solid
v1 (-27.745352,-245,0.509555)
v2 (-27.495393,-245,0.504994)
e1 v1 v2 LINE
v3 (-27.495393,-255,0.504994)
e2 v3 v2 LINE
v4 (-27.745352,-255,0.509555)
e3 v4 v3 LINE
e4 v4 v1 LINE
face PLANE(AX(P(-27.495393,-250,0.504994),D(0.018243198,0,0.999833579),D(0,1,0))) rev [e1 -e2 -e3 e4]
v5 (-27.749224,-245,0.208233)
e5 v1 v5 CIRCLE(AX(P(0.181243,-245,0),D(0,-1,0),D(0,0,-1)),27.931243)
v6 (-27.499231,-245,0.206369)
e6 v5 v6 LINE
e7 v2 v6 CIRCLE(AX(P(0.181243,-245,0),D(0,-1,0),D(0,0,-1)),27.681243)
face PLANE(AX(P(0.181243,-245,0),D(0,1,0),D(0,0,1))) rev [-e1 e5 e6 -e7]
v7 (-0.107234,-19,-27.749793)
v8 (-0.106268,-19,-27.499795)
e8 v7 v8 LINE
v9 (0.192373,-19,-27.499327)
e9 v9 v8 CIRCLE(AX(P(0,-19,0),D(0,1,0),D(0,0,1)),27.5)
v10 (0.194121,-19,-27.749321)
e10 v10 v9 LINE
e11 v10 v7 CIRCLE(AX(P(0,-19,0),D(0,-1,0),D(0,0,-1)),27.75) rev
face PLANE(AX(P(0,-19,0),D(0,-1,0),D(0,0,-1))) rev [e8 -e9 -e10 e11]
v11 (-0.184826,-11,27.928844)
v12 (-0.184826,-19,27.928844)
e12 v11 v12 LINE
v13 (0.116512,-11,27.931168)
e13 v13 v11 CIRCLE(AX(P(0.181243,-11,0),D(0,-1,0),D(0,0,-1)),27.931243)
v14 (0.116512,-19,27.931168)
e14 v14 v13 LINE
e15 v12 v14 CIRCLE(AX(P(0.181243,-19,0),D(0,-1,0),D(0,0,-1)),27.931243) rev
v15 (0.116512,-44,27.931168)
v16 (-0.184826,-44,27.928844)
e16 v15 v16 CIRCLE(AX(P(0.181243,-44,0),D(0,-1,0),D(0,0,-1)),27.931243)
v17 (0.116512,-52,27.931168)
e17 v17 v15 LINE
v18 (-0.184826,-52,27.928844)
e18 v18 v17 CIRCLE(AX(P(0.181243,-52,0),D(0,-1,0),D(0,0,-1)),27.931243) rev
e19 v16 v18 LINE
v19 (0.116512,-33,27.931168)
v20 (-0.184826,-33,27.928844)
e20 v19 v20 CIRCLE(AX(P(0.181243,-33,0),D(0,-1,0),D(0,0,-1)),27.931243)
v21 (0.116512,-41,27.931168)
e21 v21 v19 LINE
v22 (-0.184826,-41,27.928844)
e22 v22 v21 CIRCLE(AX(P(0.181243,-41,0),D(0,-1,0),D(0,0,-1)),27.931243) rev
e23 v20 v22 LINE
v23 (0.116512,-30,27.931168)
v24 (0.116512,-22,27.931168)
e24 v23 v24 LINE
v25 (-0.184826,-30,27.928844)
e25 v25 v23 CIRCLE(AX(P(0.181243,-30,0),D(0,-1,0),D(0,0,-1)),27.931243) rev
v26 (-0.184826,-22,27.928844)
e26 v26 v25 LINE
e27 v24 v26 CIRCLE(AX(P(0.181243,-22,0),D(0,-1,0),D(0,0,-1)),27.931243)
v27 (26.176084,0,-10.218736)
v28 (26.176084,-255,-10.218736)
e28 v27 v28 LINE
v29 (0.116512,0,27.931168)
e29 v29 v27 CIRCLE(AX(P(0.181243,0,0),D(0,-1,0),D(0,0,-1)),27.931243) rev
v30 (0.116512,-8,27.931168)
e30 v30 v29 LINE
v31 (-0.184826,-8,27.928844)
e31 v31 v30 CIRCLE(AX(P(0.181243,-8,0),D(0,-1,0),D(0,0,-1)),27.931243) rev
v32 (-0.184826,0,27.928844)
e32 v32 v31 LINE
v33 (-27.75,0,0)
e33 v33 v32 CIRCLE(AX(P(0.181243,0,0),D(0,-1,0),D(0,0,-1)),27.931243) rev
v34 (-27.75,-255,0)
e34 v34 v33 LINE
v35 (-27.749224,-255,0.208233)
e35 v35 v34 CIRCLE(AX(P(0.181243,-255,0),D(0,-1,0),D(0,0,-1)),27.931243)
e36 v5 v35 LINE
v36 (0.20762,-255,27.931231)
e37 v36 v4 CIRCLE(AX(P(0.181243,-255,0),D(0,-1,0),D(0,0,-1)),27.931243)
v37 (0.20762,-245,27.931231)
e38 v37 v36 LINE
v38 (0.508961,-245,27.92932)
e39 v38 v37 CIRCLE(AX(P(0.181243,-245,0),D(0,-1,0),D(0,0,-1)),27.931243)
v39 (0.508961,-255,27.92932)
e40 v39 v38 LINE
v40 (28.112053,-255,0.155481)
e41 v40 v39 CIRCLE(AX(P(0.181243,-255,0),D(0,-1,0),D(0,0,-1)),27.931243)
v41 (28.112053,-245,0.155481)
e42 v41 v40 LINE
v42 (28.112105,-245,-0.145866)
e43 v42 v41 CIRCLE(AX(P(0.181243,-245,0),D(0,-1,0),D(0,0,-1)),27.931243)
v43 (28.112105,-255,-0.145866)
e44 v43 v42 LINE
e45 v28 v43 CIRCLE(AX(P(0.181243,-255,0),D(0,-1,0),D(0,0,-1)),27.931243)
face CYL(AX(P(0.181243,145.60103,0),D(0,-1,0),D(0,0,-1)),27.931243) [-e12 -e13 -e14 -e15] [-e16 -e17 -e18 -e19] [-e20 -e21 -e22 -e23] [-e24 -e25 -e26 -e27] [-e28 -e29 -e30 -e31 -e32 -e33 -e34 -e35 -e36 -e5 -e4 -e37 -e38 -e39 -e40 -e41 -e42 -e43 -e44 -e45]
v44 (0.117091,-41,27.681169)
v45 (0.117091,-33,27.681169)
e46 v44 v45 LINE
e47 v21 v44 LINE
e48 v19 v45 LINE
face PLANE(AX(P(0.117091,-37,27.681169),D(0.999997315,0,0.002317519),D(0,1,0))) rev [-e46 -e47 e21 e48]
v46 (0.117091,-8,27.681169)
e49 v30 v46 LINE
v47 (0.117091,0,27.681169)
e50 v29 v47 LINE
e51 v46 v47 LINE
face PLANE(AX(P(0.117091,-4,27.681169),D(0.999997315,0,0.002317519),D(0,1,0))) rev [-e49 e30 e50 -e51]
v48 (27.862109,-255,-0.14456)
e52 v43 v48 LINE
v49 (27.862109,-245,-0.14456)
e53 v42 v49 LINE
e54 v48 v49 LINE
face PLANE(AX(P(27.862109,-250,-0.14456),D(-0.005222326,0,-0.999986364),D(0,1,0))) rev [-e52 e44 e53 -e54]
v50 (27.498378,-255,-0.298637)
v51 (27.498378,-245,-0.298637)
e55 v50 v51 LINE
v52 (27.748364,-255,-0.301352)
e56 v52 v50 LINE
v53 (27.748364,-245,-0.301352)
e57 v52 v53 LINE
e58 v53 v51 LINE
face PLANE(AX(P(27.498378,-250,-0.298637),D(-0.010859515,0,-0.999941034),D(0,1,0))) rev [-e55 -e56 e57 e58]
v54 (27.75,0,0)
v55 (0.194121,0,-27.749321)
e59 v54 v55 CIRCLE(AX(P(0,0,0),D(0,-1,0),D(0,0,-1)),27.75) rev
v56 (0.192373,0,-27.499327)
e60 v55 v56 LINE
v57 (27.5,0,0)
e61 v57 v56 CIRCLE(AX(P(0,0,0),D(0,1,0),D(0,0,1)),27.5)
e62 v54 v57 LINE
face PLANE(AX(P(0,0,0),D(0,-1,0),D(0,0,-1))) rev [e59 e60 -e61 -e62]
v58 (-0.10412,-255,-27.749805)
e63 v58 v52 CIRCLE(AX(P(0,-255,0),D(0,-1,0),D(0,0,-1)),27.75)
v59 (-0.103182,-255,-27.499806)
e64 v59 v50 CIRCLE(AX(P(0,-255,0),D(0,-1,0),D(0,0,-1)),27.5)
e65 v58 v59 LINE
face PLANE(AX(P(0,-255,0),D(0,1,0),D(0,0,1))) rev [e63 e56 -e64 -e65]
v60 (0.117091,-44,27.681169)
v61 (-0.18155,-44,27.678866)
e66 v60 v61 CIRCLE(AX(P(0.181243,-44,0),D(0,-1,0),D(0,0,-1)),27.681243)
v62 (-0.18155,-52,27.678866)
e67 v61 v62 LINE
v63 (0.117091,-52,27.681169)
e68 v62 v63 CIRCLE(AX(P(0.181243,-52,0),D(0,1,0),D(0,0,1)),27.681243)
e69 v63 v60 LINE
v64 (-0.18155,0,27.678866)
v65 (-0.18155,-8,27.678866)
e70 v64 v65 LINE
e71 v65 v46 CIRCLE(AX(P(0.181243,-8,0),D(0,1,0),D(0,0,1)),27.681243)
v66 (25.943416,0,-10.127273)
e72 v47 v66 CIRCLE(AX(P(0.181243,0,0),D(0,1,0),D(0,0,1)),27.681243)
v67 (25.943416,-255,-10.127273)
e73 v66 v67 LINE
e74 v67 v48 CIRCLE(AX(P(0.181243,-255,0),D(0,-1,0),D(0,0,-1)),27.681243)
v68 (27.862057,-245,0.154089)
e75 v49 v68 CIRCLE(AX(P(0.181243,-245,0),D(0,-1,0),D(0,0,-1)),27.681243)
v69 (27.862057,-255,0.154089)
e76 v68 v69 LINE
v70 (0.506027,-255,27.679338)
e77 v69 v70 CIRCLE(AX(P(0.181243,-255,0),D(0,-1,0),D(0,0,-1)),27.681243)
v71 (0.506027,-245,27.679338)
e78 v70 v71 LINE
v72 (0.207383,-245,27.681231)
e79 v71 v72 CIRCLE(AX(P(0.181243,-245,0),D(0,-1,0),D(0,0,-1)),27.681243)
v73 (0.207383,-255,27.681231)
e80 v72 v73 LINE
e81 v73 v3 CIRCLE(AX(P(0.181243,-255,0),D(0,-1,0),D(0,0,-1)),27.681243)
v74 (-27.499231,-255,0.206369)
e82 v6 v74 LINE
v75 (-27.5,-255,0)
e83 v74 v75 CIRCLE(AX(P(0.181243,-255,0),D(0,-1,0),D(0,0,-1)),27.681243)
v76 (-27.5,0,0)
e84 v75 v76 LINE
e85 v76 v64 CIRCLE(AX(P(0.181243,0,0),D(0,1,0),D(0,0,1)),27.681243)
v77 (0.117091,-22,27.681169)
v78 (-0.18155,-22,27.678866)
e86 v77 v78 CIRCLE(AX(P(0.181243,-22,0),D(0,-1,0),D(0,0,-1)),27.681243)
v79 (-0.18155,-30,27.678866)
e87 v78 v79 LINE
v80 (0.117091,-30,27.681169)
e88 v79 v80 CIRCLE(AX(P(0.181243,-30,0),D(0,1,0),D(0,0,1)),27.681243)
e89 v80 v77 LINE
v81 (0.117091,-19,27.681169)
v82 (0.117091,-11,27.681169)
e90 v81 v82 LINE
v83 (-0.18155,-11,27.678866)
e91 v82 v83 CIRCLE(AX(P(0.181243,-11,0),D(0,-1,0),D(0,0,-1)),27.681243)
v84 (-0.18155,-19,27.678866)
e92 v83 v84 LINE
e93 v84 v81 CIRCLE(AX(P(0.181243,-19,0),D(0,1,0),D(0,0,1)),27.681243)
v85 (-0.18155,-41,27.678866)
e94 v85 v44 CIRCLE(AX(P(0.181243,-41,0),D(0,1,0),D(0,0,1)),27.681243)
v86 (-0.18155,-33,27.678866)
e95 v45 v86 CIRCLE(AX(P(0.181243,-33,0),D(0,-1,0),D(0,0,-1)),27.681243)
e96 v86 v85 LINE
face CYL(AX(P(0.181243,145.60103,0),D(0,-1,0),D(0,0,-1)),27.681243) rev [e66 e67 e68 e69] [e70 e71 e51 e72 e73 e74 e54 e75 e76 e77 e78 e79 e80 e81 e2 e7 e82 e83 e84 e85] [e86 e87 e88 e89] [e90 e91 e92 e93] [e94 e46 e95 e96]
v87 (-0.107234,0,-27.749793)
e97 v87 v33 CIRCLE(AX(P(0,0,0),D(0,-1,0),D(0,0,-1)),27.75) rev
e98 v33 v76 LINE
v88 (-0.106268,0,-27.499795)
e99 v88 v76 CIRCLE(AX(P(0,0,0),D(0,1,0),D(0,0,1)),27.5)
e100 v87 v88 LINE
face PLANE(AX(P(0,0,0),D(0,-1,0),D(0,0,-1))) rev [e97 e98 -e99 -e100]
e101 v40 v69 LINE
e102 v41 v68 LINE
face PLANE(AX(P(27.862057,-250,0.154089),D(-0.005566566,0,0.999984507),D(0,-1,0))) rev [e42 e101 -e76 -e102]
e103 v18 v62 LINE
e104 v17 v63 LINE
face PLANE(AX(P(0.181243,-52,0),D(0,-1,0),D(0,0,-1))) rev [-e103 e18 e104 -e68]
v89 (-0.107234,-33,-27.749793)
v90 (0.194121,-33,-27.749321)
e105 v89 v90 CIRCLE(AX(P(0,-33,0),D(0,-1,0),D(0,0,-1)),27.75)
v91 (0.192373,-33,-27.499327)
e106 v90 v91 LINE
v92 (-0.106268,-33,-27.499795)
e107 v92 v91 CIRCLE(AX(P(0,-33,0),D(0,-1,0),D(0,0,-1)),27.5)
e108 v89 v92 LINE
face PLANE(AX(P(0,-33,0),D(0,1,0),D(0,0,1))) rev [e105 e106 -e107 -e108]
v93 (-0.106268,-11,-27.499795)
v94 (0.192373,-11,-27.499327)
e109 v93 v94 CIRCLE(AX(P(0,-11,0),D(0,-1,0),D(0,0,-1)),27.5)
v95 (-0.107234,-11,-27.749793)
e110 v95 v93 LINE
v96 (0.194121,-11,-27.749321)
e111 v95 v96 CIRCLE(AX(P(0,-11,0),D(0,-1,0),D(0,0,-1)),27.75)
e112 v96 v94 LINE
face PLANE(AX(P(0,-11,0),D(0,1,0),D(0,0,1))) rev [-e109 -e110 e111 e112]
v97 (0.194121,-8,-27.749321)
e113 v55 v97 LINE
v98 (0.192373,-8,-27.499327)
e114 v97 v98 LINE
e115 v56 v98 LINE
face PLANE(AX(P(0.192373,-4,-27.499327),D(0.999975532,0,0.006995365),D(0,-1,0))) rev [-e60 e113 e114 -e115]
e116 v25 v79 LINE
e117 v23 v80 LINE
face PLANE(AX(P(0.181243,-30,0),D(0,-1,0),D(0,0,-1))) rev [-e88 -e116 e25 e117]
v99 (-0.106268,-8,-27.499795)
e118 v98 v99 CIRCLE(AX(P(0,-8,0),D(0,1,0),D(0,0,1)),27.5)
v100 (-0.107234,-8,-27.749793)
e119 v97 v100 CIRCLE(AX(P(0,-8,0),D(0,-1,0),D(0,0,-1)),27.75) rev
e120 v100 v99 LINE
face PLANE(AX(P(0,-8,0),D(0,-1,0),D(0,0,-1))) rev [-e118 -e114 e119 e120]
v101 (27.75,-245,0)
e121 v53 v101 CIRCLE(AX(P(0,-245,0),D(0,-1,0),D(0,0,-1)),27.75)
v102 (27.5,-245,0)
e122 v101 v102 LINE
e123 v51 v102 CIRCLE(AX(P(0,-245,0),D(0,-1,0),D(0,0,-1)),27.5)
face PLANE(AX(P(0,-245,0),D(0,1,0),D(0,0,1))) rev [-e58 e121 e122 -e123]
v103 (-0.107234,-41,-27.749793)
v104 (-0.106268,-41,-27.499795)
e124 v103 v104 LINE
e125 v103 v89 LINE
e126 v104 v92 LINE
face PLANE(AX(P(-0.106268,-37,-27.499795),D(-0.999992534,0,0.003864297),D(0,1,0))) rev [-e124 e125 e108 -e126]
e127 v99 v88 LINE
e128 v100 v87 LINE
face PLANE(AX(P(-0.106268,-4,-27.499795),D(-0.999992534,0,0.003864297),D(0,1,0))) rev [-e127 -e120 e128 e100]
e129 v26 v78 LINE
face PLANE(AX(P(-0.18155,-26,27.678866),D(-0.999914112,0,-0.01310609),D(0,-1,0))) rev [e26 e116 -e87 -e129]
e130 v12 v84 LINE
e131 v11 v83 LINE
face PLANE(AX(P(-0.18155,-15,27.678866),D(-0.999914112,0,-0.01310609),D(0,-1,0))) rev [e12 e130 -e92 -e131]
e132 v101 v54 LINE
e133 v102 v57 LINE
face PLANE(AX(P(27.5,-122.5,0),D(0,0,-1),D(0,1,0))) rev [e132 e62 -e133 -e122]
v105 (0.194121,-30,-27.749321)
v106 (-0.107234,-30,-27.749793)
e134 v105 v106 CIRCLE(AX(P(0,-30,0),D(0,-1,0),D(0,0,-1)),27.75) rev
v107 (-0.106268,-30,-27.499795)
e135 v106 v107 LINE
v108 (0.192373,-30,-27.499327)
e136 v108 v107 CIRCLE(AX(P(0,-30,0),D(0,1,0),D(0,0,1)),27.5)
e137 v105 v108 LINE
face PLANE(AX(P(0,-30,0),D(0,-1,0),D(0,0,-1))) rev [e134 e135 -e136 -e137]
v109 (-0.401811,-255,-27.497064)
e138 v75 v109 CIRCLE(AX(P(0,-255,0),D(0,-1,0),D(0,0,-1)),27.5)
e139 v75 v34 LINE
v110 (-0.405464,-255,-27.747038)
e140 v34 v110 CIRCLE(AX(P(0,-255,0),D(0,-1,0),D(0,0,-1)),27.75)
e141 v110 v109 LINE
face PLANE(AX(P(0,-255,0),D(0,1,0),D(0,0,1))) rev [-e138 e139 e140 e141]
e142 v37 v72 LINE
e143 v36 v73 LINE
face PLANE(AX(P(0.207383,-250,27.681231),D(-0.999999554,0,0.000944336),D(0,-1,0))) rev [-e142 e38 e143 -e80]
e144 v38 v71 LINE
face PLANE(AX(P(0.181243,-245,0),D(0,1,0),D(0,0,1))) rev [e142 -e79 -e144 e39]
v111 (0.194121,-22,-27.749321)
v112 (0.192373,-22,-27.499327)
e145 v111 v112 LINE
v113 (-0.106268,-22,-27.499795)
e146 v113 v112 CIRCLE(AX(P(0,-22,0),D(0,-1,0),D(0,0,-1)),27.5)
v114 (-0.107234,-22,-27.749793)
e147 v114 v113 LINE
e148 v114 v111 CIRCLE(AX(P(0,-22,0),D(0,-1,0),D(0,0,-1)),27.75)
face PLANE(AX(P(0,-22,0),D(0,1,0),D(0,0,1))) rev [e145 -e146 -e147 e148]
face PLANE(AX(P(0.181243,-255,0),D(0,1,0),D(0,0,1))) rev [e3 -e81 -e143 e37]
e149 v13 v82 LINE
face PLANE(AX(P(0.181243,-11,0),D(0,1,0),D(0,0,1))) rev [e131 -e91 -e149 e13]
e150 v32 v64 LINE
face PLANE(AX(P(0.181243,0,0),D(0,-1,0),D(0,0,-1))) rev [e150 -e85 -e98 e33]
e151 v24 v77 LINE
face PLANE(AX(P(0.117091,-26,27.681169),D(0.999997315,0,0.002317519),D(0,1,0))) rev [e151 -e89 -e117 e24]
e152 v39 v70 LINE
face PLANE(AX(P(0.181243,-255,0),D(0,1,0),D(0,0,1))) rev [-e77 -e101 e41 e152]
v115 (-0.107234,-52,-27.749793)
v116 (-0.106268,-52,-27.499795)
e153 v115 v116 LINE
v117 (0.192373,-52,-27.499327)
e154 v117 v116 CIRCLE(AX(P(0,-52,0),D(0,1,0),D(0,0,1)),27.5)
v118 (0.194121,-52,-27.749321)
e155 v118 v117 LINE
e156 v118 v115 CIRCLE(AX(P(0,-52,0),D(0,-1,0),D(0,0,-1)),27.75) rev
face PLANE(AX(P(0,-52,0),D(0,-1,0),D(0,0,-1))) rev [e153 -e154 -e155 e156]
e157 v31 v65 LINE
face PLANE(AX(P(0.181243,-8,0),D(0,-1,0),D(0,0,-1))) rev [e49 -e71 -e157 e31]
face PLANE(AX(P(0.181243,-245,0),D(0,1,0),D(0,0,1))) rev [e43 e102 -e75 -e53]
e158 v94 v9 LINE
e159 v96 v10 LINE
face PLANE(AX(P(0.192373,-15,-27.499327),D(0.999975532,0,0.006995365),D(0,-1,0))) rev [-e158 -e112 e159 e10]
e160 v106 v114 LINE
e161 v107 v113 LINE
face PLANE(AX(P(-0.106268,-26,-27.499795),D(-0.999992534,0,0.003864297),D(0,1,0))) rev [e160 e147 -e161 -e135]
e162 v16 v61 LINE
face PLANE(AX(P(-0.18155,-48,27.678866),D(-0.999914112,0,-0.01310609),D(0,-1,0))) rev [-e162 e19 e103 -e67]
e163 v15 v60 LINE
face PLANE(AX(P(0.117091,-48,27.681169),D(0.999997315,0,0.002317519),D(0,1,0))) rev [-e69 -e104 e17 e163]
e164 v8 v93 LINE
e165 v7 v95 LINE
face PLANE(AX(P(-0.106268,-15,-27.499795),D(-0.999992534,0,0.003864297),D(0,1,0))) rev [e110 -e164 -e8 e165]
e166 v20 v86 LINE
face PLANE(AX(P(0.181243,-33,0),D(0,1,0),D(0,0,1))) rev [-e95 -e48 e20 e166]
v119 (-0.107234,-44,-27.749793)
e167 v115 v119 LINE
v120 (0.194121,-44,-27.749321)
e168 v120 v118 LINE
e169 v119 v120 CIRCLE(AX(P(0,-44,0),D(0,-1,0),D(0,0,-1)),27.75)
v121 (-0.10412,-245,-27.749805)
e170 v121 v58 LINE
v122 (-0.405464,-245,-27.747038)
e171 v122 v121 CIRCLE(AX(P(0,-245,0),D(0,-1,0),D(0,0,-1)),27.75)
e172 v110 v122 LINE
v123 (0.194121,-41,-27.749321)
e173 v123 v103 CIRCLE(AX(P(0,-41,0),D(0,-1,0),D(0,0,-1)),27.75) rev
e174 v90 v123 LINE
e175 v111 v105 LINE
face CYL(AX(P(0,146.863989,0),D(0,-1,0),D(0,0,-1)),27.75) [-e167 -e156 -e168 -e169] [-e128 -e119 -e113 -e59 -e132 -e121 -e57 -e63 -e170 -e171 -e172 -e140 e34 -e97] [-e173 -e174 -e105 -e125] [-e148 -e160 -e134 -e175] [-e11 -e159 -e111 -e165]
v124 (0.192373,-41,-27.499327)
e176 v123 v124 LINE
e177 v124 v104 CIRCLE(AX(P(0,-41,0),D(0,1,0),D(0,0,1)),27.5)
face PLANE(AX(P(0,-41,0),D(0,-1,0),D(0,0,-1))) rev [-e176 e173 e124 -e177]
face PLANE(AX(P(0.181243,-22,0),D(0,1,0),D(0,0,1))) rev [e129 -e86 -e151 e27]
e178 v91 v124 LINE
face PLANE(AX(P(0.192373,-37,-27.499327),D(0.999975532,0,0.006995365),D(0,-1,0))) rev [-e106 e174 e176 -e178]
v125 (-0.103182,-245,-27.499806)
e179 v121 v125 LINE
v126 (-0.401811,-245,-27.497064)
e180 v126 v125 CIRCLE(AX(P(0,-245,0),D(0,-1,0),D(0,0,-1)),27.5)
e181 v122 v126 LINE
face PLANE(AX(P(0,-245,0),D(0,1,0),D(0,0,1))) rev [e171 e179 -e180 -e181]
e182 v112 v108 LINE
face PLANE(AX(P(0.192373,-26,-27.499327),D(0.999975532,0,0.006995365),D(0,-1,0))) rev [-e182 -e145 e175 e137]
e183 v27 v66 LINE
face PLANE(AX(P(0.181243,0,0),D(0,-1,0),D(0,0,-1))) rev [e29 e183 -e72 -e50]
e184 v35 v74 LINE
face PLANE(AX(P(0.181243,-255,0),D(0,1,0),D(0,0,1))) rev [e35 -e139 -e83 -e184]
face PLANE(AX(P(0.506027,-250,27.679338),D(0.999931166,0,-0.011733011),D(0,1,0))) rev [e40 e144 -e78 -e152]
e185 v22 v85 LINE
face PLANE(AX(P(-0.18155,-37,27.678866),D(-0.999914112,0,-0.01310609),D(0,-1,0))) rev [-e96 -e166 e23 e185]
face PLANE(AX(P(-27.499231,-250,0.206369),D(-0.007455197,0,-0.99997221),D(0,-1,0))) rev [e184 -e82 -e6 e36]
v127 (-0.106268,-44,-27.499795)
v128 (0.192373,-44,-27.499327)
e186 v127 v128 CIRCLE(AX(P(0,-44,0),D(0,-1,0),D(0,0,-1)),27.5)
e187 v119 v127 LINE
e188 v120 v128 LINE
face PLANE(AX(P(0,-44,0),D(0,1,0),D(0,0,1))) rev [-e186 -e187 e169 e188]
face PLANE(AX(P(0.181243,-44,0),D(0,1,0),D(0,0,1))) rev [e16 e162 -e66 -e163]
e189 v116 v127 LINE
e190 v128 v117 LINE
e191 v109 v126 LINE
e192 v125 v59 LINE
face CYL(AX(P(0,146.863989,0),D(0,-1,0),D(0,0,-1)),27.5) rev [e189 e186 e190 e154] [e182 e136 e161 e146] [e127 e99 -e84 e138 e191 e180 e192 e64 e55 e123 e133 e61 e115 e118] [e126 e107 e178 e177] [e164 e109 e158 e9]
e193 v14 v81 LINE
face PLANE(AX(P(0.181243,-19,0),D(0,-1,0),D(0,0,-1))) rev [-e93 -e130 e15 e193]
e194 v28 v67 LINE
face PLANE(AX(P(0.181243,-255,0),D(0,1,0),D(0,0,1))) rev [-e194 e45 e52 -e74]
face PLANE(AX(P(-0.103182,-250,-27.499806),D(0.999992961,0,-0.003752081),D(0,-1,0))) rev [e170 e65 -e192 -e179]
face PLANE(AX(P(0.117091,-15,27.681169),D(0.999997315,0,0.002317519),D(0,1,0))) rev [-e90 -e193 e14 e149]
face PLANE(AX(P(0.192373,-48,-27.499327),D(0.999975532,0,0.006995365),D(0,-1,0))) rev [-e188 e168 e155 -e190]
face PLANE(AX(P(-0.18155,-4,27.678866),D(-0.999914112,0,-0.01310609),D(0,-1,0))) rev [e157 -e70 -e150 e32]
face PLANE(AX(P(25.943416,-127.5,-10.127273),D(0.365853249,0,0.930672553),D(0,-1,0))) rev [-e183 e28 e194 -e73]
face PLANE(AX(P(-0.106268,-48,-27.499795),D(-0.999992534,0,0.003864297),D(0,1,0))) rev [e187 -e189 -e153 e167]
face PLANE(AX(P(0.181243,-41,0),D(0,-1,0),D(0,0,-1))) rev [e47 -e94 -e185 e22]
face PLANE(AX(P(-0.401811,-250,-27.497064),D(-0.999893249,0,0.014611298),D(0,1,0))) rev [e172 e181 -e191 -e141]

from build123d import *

# Parameters (mm, degrees)
BASE_FLANGE1_DEPTH   = 255
UNFOLD1_START        = -255
UNFOLD1_DEPTH        = 255
UNFOLD1_2_DEPTH      = 255
SKETCH6_W            = 0.3
SKETCH6_H            = 8
CUT_EXTRUDE1_DEPTH   = 315.779958422
LPATTERN1_COUNT      = 2
LPATTERN1_PITCH      = 86.9
LPATTERN1_COUNT_DIR2 = 5
LPATTERN1_PITCH_DIR2 = 11
SKETCH7_W            = 0.3
SKETCH7_H            = 10
CUT_EXTRUDE2_DEPTH   = 315.779958422
LPATTERN2_COUNT      = 5
LPATTERN2_PITCH      = 43.4969
FOLD1_START          = -255
FOLD1_DEPTH          = 255
FOLD1_2_DEPTH        = 10
FOLD1_3_DEPTH        = 255
FOLD1_START_2        = -245
FOLD1_4_DEPTH        = 193
FOLD1_START_3        = -52
FOLD1_5_DEPTH        = 52
FOLD1_6_DEPTH        = 10
FOLD1_START_4        = -44
FOLD1_7_DEPTH        = 3
FOLD1_START_5        = -33
FOLD1_8_DEPTH        = 3
FOLD1_START_6        = -22
FOLD1_9_DEPTH        = 3
FOLD1_START_7        = -11
FOLD1_10_DEPTH       = 3


# Read off the part's stored shape, not the designer's step: Unfold1, Fold1
# Sheet-metal steps are written as plain solids
with BuildPart() as part:
    # Sketch1 → Base-Flange1 (new body)
    with BuildSketch(Plane(origin=(0, 0, 0), x_dir=(1, 0, 0), z_dir=(0, 1, 0))):
        with BuildLine():
            ThreePointArc((27.5, 0), (0, 27.5), (-27.5, 0))
            ThreePointArc((-27.5, 0), (5.334991298, -27.197244319), (25.943416257, 10.127272727))
            Line((25.943416257, 10.127272727), (26.176084396, 10.21873604))
            ThreePointArc((26.176084396, 10.21873604), (5.381536789, -27.442873139), (-27.75, 0))
            ThreePointArc((-27.75, 0), (0, 27.75), (27.75, 0))
            Line((27.75, 0), (27.5, 0))
        make_face()
    extrude(amount=-BASE_FLANGE1_DEPTH)

    # Unfold1 outline → Unfold1 (cut)
    with BuildSketch(Plane(origin=(0, 0, 0), x_dir=(1, 0, 0), z_dir=(0, 1, 0)).offset(UNFOLD1_START)):
        with BuildLine():
            Line((27.5, 4.465057679), (27.5, 5.81720394))
            ThreePointArc((27.5, 5.81720394), (26.928734746, 8.045248964), (26.176084396, 10.21873604))
            Line((26.176084396, 10.21873604), (25.943416257, 10.127272727))
            ThreePointArc((25.943416257, 10.127272727), (26.872280055, 7.337558511), (27.5, 4.465057679))
        make_face()
        with BuildLine():
            ThreePointArc((-27.75, 0), (2.431208617, -27.840474058), (27.75, 4.485307483))
            Line((27.75, 4.485307483), (27.75, 2.492962419))
            ThreePointArc((27.75, 2.492962419), (1.428992542, -27.653107247), (-27.5, 0))
            ThreePointArc((-27.5, 0), (0, 27.5), (27.5, 0))
            Line((27.5, 0), (27.5, 3.716517187))
            ThreePointArc((27.5, 3.716517187), (-1.862458053, 27.687429458), (-27.75, 0))
        make_face()
    extrude(amount=UNFOLD1_DEPTH, mode=Mode.SUBTRACT)

    # Unfold1 2 outline → Unfold1 2 (add)
    with BuildSketch(Plane(origin=(0, 0, 0), x_dir=(1, 0, 0), z_dir=(0, 1, 0)).offset(UNFOLD1_START)):
        with BuildLine():
            Line((27.5, 184.557199058), (27.5, 5.81720394))
            ThreePointArc((27.5, 5.81720394), (27.633078737, 5.152772109), (27.75, 4.485307483))
            Line((27.75, 4.485307483), (27.75, 184.557199058))
            Line((27.75, 184.557199058), (27.5, 184.557199058))
        make_face()
        with BuildLine():
            ThreePointArc((27.75, 2.492962419), (27.642708515, 3.481254935), (27.5, 4.465057679))
            Line((27.5, 4.465057679), (27.5, 3.716517187))
            ThreePointArc((27.5, 3.716517187), (27.687429458, 1.862458053), (27.75, 0))
            Line((27.75, 0), (27.75, 2.492962419))
        make_face()
    extrude(amount=UNFOLD1_2_DEPTH)

    # Sketch6 → Cut-Extrude1 (cut, through all)
    with BuildSketch(Plane(origin=(27.75, 0, 0), x_dir=(0, 0, -1), z_dir=(1, 0, 0))):
        with Locations((43.35, -4)):
            Rectangle(SKETCH6_W, SKETCH6_H)
    cut_extrude1 = extrude(amount=-CUT_EXTRUDE1_DEPTH, mode=Mode.SUBTRACT)

    # LPattern1: Cut-Extrude1 2 × 5
    with Locations(*[(0, -j * LPATTERN1_PITCH_DIR2, -i * LPATTERN1_PITCH) for i in range(LPATTERN1_COUNT) for j in range(LPATTERN1_COUNT_DIR2) if (i, j) != (0, 0)]):
        add(cut_extrude1, mode=Mode.SUBTRACT)

    # Sketch7 → Cut-Extrude2 (cut, through all)
    with BuildSketch(Plane(origin=(27.75, 0, 0), x_dir=(0, 0, -1), z_dir=(1, 0, 0))):
        with Locations((0.15, -250)):
            Rectangle(SKETCH7_W, SKETCH7_H)
    cut_extrude2 = extrude(amount=-CUT_EXTRUDE2_DEPTH, mode=Mode.SUBTRACT)

    # LPattern2: Cut-Extrude2 ×5
    with Locations(*[(0, 0, -i * LPATTERN2_PITCH) for i in range(1, LPATTERN2_COUNT)]):
        add(cut_extrude2, mode=Mode.SUBTRACT)

    # Fold1 outline → Fold1 (cut)
    with BuildSketch(Plane(origin=(0, 0, 0), x_dir=(1, 0, 0), z_dir=(0, 1, 0)).offset(FOLD1_START)):
        with BuildLine():
            Line((27.5, 4.465057679), (27.5, 3.716517187))
            ThreePointArc((27.5, 3.716517187), (27.687429458, 1.862458053), (27.75, 0))
            Line((27.75, 0), (27.75, 2.492962419))
            ThreePointArc((27.75, 2.492962419), (27.642708515, 3.481254935), (27.5, 4.465057679))
        make_face()
        with BuildLine():
            ThreePointArc((27.5, 5.81720394), (27.633078737, 5.152772109), (27.75, 4.485307483))
            Line((27.75, 4.485307483), (27.75, 184.557199058))
            Line((27.75, 184.557199058), (27.5, 184.557199058))
            Line((27.5, 184.557199058), (27.5, 5.81720394))
        make_face()
    extrude(amount=FOLD1_DEPTH, mode=Mode.SUBTRACT)

    # Fold1 2 outline → Fold1 2 (cut)
    with BuildSketch(Plane(origin=(0, 0, 0), x_dir=(1, 0, 0), z_dir=(0, 1, 0)).offset(FOLD1_START)):
        with BuildLine():
            ThreePointArc((27.748378331, 0.3), (27.748371017, 0.300675772), (27.748363686, 0.301351543))
            Line((27.748363686, 0.301351543), (27.623914005, 0.3))
            Line((27.623914005, 0.3), (27.748378331, 0.3))
        make_face()
    extrude(amount=FOLD1_2_DEPTH, mode=Mode.SUBTRACT)

    # Fold1 3 outline → Fold1 3 (add)
    with BuildSketch(Plane(origin=(0, 0, 0), x_dir=(1, 0, 0), z_dir=(0, 1, 0)).offset(FOLD1_START)):
        with BuildLine():
            Line((0.194121372, 27.749321017), (0.192372531, 27.499327134))
            ThreePointArc((0.192372531, 27.499327134), (19.407828644, 19.482971727), (27.498378428, 0.298636664))
            Line((27.498378428, 0.298636664), (27.623914005, 0.3))
            Line((27.623914005, 0.3), (27.5, 0.3))
            Line((27.5, 0.3), (27.5, 3.716517187))
            ThreePointArc((27.5, 3.716517187), (18.333984963, 20.830926417), (0.194121372, 27.749321017))
        make_face()
        with BuildLine():
            ThreePointArc((25.943416257, 10.127272727), (26.872280055, 7.337558511), (27.5, 4.465057679))
            Line((27.5, 4.465057679), (27.5, 5.81720394))
            ThreePointArc((27.5, 5.81720394), (26.928734746, 8.045248964), (26.176084396, 10.21873604))
            Line((26.176084396, 10.21873604), (25.943416257, 10.127272727))
        make_face()
        with BuildLine():
            ThreePointArc((-27.5, 0), (-19.586982848, 19.302852196), (-0.401810697, 27.497064355))
            Line((-0.401810697, 27.497064355), (-0.405463521, 27.747037668))
            ThreePointArc((-0.405463521, 27.747037668), (-19.765046328, 19.478332671), (-27.75, 0))
            ThreePointArc((-27.75, 0), (-27.749805944, -0.104117185), (-27.74922378, -0.208232924))
            Line((-27.74922378, -0.208232924), (-27.499230728, -0.206369125))
            ThreePointArc((-27.499230728, -0.206369125), (-27.499807681, -0.103185279), (-27.5, 0))
        make_face()
        with BuildLine():
            Line((27.75, 4.485307483), (27.75, 2.492962419))
            ThreePointArc((27.75, 2.492962419), (27.830997978, 1.319952212), (27.86210871, 0.144560473))
            Line((27.86210871, 0.144560473), (28.112105301, 0.145866054))
            ThreePointArc((28.112105301, 0.145866054), (28.015747193, 2.322654117), (27.75, 4.485307483))
        make_face()
        with BuildLine():
            Line((28.112053433, -0.155481098), (27.862057305, -0.154089457))
            ThreePointArc((27.862057305, -0.154089457), (19.815096757, -19.513149653), (0.506027414, -27.679337678))
            Line((0.506027414, -27.679337678), (0.508960666, -27.929320469))
            ThreePointArc((0.508960666, -27.929320469), (19.992417674, -19.689380446), (28.112053433, -0.155481098))
        make_face()
        with BuildLine():
            ThreePointArc((-0.181549779, -27.678865592), (-19.342005015, -19.623812129), (-27.49539326, -0.504994403))
            Line((-27.49539326, -0.504994403), (-27.745351655, -0.509555202))
            ThreePointArc((-27.745351655, -0.509555202), (-19.518327011, -19.801042357), (-0.184826302, -27.92884412))
            Line((-0.184826302, -27.92884412), (-0.181549779, -27.678865592))
        make_face()
        with BuildLine():
            Line((0.207619564, -27.931230638), (0.20738348, -27.681230749))
            ThreePointArc((0.20738348, -27.681230749), (0.162237351, -27.681236567), (0.117091273, -27.681168755))
            Line((0.117091273, -27.681168755), (0.116511894, -27.931168084))
            ThreePointArc((0.116511894, -27.931168084), (0.162065703, -27.931236508), (0.207619564, -27.931230638))
        make_face()
    extrude(amount=FOLD1_3_DEPTH)

    # Fold1 4 outline → Fold1 4 (add)
    with BuildSketch(Plane(origin=(0, 0, 0), x_dir=(1, 0, 0), z_dir=(0, 1, 0)).offset(FOLD1_START_2)):
        with BuildLine():
            Line((0.192372531, 27.499327134), (0.194121372, 27.749321017))
            ThreePointArc((0.194121372, 27.749321017), (-0.105677242, 27.74979878), (-0.405463521, 27.747037668))
            Line((-0.405463521, 27.747037668), (-0.401810697, 27.497064355))
            ThreePointArc((-0.401810697, 27.497064355), (-0.104725195, 27.499800593), (0.192372531, 27.499327134))
        make_face()
        with BuildLine():
            Line((27.5, 0.298654275), (27.498378428, 0.298636664))
            ThreePointArc((27.498378428, 0.298636664), (27.499594604, 0.149320533), (27.5, 0))
            Line((27.5, 0), (27.5, 0.298654275))
        make_face()
        with BuildLine():
            Line((28.112105301, 0.145866054), (27.86210871, 0.144560473))
            ThreePointArc((27.86210871, 0.144560473), (27.862485773, -0.004764561), (27.862057305, -0.154089457))
            Line((27.862057305, -0.154089457), (28.112053433, -0.155481098))
            ThreePointArc((28.112053433, -0.155481098), (28.11248577, -0.004807592), (28.112105301, 0.145866054))
        make_face()
        with BuildLine():
            ThreePointArc((-27.49539326, -0.504994403), (-27.497714727, -0.355686939), (-27.499230728, -0.206369125))
            Line((-27.499230728, -0.206369125), (-27.74922378, -0.208232924))
            ThreePointArc((-27.74922378, -0.208232924), (-27.747694087, -0.358899285), (-27.745351655, -0.509555202))
            Line((-27.745351655, -0.509555202), (-27.49539326, -0.504994403))
        make_face()
        with BuildLine():
            Line((0.508960666, -27.929320469), (0.506027414, -27.679337678))
            ThreePointArc((0.506027414, -27.679337678), (0.356708, -27.680686971), (0.20738348, -27.681230749))
            Line((0.20738348, -27.681230749), (0.207619564, -27.931230638))
            ThreePointArc((0.207619564, -27.931230638), (0.358292691, -27.930681948), (0.508960666, -27.929320469))
        make_face()
        with BuildLine():
            ThreePointArc((0.117091273, -27.681168755), (-0.032232359, -27.680419927), (-0.181549779, -27.678865592))
            Line((-0.181549779, -27.678865592), (-0.184826302, -27.92884412))
            ThreePointArc((-0.184826302, -27.92884412), (-0.034160338, -27.930412493), (0.116511894, -27.931168084))
            Line((0.116511894, -27.931168084), (0.117091273, -27.681168755))
        make_face()
    extrude(amount=FOLD1_4_DEPTH)

    # Fold1 5 outline → Fold1 5 (add)
    with BuildSketch(Plane(origin=(0, 0, 0), x_dir=(1, 0, 0), z_dir=(0, 1, 0)).offset(FOLD1_START_3)):
        with BuildLine():
            Line((27.5, 0.298654275), (27.498378428, 0.298636664))
            ThreePointArc((27.498378428, 0.298636664), (27.499594604, 0.149320533), (27.5, 0))
            Line((27.5, 0), (27.5, 0.298654275))
        make_face()
        with BuildLine():
            ThreePointArc((-0.401810697, 27.497064355), (-0.254043101, 27.498826559), (-0.106268169, 27.499794673))
            Line((-0.106268169, 27.499794673), (-0.107234244, 27.749792807))
            ThreePointArc((-0.107234244, 27.749792807), (-0.256352584, 27.748815891), (-0.405463521, 27.747037668))
            Line((-0.405463521, 27.747037668), (-0.401810697, 27.497064355))
        make_face()
        with BuildLine():
            Line((28.112105301, 0.145866054), (27.86210871, 0.144560473))
            ThreePointArc((27.86210871, 0.144560473), (27.862485773, -0.004764561), (27.862057305, -0.154089457))
            Line((27.862057305, -0.154089457), (28.112053433, -0.155481098))
            ThreePointArc((28.112053433, -0.155481098), (28.11248577, -0.004807592), (28.112105301, 0.145866054))
        make_face()
        with BuildLine():
            ThreePointArc((-27.49539326, -0.504994403), (-27.497714727, -0.355686939), (-27.499230728, -0.206369125))
            Line((-27.499230728, -0.206369125), (-27.74922378, -0.208232924))
            ThreePointArc((-27.74922378, -0.208232924), (-27.747694087, -0.358899285), (-27.745351655, -0.509555202))
            Line((-27.745351655, -0.509555202), (-27.49539326, -0.504994403))
        make_face()
        with BuildLine():
            Line((0.508960666, -27.929320469), (0.506027414, -27.679337678))
            ThreePointArc((0.506027414, -27.679337678), (0.356708, -27.680686971), (0.20738348, -27.681230749))
            Line((0.20738348, -27.681230749), (0.207619564, -27.931230638))
            ThreePointArc((0.207619564, -27.931230638), (0.358292691, -27.930681948), (0.508960666, -27.929320469))
        make_face()
    extrude(amount=FOLD1_5_DEPTH)

    # Fold1 6 outline → Fold1 6 (add)
    with BuildSketch(Plane(origin=(0, 0, 0), x_dir=(1, 0, 0), z_dir=(0, 1, 0)).offset(FOLD1_START)):
        with BuildLine():
            ThreePointArc((-0.103182219, 27.499806425), (0.0445958, 27.49996384), (0.192372531, 27.499327134))
            Line((0.192372531, 27.499327134), (0.194121372, 27.749321017))
            ThreePointArc((0.194121372, 27.749321017), (0.045001216, 27.749963512), (-0.104120239, 27.749804666))
            Line((-0.104120239, 27.749804666), (-0.103182219, 27.499806425))
        make_face()
        with BuildLine():
            ThreePointArc((0.117091273, -27.681168755), (-0.032232359, -27.680419927), (-0.181549779, -27.678865592))
            Line((-0.181549779, -27.678865592), (-0.184826302, -27.92884412))
            ThreePointArc((-0.184826302, -27.92884412), (-0.034160338, -27.930412493), (0.116511894, -27.931168084))
            Line((0.116511894, -27.931168084), (0.117091273, -27.681168755))
        make_face()
    extrude(amount=FOLD1_6_DEPTH)

    # Fold1 7 outline → Fold1 7 (add)
    with BuildSketch(Plane(origin=(0, 0, 0), x_dir=(1, 0, 0), z_dir=(0, 1, 0)).offset(FOLD1_START_4)):
        with BuildLine():
            Line((0.192372531, 27.499327134), (0.194121372, 27.749321017))
            ThreePointArc((0.194121372, 27.749321017), (0.043444204, 27.749965993), (-0.107234244, 27.749792807))
            Line((-0.107234244, 27.749792807), (-0.106268169, 27.499794673))
            ThreePointArc((-0.106268169, 27.499794673), (0.043052816, 27.499966299), (0.192372531, 27.499327134))
        make_face()
        with BuildLine():
            ThreePointArc((0.117091273, -27.681168755), (-0.032232359, -27.680419927), (-0.181549779, -27.678865592))
            Line((-0.181549779, -27.678865592), (-0.184826302, -27.92884412))
            ThreePointArc((-0.184826302, -27.92884412), (-0.034160338, -27.930412493), (0.116511894, -27.931168084))
            Line((0.116511894, -27.931168084), (0.117091273, -27.681168755))
        make_face()
    extrude(amount=FOLD1_7_DEPTH)

    # Fold1 8 outline → Fold1 8 (add)
    with BuildSketch(Plane(origin=(0, 0, 0), x_dir=(1, 0, 0), z_dir=(0, 1, 0)).offset(FOLD1_START_5)):
        with BuildLine():
            Line((0.192372531, 27.499327134), (0.194121372, 27.749321017))
            ThreePointArc((0.194121372, 27.749321017), (0.043444204, 27.749965993), (-0.107234244, 27.749792807))
            Line((-0.107234244, 27.749792807), (-0.106268169, 27.499794673))
            ThreePointArc((-0.106268169, 27.499794673), (0.043052816, 27.499966299), (0.192372531, 27.499327134))
        make_face()
        with BuildLine():
            ThreePointArc((0.117091273, -27.681168755), (-0.032232359, -27.680419927), (-0.181549779, -27.678865592))
            Line((-0.181549779, -27.678865592), (-0.184826302, -27.92884412))
            ThreePointArc((-0.184826302, -27.92884412), (-0.034160338, -27.930412493), (0.116511894, -27.931168084))
            Line((0.116511894, -27.931168084), (0.117091273, -27.681168755))
        make_face()
    extrude(amount=FOLD1_8_DEPTH)

    # Fold1 9 outline → Fold1 9 (add)
    with BuildSketch(Plane(origin=(0, 0, 0), x_dir=(1, 0, 0), z_dir=(0, 1, 0)).offset(FOLD1_START_6)):
        with BuildLine():
            Line((0.192372531, 27.499327134), (0.194121372, 27.749321017))
            ThreePointArc((0.194121372, 27.749321017), (0.043444204, 27.749965993), (-0.107234244, 27.749792807))
            Line((-0.107234244, 27.749792807), (-0.106268169, 27.499794673))
            ThreePointArc((-0.106268169, 27.499794673), (0.043052816, 27.499966299), (0.192372531, 27.499327134))
        make_face()
        with BuildLine():
            ThreePointArc((0.117091273, -27.681168755), (-0.032232359, -27.680419927), (-0.181549779, -27.678865592))
            Line((-0.181549779, -27.678865592), (-0.184826302, -27.92884412))
            ThreePointArc((-0.184826302, -27.92884412), (-0.034160338, -27.930412493), (0.116511894, -27.931168084))
            Line((0.116511894, -27.931168084), (0.117091273, -27.681168755))
        make_face()
    extrude(amount=FOLD1_9_DEPTH)

    # Fold1 10 outline → Fold1 10 (add)
    with BuildSketch(Plane(origin=(0, 0, 0), x_dir=(1, 0, 0), z_dir=(0, 1, 0)).offset(FOLD1_START_7)):
        with BuildLine():
            Line((0.192372531, 27.499327134), (0.194121372, 27.749321017))
            ThreePointArc((0.194121372, 27.749321017), (0.043444204, 27.749965993), (-0.107234244, 27.749792807))
            Line((-0.107234244, 27.749792807), (-0.106268169, 27.499794673))
            ThreePointArc((-0.106268169, 27.499794673), (0.043052816, 27.499966299), (0.192372531, 27.499327134))
        make_face()
        with BuildLine():
            ThreePointArc((0.117091273, -27.681168755), (-0.032232359, -27.680419927), (-0.181549779, -27.678865592))
            Line((-0.181549779, -27.678865592), (-0.184826302, -27.92884412))
            ThreePointArc((-0.184826302, -27.92884412), (-0.034160338, -27.930412493), (0.116511894, -27.931168084))
            Line((0.116511894, -27.931168084), (0.117091273, -27.681168755))
        make_face()
    extrude(amount=FOLD1_10_DEPTH)


solid = part.part
